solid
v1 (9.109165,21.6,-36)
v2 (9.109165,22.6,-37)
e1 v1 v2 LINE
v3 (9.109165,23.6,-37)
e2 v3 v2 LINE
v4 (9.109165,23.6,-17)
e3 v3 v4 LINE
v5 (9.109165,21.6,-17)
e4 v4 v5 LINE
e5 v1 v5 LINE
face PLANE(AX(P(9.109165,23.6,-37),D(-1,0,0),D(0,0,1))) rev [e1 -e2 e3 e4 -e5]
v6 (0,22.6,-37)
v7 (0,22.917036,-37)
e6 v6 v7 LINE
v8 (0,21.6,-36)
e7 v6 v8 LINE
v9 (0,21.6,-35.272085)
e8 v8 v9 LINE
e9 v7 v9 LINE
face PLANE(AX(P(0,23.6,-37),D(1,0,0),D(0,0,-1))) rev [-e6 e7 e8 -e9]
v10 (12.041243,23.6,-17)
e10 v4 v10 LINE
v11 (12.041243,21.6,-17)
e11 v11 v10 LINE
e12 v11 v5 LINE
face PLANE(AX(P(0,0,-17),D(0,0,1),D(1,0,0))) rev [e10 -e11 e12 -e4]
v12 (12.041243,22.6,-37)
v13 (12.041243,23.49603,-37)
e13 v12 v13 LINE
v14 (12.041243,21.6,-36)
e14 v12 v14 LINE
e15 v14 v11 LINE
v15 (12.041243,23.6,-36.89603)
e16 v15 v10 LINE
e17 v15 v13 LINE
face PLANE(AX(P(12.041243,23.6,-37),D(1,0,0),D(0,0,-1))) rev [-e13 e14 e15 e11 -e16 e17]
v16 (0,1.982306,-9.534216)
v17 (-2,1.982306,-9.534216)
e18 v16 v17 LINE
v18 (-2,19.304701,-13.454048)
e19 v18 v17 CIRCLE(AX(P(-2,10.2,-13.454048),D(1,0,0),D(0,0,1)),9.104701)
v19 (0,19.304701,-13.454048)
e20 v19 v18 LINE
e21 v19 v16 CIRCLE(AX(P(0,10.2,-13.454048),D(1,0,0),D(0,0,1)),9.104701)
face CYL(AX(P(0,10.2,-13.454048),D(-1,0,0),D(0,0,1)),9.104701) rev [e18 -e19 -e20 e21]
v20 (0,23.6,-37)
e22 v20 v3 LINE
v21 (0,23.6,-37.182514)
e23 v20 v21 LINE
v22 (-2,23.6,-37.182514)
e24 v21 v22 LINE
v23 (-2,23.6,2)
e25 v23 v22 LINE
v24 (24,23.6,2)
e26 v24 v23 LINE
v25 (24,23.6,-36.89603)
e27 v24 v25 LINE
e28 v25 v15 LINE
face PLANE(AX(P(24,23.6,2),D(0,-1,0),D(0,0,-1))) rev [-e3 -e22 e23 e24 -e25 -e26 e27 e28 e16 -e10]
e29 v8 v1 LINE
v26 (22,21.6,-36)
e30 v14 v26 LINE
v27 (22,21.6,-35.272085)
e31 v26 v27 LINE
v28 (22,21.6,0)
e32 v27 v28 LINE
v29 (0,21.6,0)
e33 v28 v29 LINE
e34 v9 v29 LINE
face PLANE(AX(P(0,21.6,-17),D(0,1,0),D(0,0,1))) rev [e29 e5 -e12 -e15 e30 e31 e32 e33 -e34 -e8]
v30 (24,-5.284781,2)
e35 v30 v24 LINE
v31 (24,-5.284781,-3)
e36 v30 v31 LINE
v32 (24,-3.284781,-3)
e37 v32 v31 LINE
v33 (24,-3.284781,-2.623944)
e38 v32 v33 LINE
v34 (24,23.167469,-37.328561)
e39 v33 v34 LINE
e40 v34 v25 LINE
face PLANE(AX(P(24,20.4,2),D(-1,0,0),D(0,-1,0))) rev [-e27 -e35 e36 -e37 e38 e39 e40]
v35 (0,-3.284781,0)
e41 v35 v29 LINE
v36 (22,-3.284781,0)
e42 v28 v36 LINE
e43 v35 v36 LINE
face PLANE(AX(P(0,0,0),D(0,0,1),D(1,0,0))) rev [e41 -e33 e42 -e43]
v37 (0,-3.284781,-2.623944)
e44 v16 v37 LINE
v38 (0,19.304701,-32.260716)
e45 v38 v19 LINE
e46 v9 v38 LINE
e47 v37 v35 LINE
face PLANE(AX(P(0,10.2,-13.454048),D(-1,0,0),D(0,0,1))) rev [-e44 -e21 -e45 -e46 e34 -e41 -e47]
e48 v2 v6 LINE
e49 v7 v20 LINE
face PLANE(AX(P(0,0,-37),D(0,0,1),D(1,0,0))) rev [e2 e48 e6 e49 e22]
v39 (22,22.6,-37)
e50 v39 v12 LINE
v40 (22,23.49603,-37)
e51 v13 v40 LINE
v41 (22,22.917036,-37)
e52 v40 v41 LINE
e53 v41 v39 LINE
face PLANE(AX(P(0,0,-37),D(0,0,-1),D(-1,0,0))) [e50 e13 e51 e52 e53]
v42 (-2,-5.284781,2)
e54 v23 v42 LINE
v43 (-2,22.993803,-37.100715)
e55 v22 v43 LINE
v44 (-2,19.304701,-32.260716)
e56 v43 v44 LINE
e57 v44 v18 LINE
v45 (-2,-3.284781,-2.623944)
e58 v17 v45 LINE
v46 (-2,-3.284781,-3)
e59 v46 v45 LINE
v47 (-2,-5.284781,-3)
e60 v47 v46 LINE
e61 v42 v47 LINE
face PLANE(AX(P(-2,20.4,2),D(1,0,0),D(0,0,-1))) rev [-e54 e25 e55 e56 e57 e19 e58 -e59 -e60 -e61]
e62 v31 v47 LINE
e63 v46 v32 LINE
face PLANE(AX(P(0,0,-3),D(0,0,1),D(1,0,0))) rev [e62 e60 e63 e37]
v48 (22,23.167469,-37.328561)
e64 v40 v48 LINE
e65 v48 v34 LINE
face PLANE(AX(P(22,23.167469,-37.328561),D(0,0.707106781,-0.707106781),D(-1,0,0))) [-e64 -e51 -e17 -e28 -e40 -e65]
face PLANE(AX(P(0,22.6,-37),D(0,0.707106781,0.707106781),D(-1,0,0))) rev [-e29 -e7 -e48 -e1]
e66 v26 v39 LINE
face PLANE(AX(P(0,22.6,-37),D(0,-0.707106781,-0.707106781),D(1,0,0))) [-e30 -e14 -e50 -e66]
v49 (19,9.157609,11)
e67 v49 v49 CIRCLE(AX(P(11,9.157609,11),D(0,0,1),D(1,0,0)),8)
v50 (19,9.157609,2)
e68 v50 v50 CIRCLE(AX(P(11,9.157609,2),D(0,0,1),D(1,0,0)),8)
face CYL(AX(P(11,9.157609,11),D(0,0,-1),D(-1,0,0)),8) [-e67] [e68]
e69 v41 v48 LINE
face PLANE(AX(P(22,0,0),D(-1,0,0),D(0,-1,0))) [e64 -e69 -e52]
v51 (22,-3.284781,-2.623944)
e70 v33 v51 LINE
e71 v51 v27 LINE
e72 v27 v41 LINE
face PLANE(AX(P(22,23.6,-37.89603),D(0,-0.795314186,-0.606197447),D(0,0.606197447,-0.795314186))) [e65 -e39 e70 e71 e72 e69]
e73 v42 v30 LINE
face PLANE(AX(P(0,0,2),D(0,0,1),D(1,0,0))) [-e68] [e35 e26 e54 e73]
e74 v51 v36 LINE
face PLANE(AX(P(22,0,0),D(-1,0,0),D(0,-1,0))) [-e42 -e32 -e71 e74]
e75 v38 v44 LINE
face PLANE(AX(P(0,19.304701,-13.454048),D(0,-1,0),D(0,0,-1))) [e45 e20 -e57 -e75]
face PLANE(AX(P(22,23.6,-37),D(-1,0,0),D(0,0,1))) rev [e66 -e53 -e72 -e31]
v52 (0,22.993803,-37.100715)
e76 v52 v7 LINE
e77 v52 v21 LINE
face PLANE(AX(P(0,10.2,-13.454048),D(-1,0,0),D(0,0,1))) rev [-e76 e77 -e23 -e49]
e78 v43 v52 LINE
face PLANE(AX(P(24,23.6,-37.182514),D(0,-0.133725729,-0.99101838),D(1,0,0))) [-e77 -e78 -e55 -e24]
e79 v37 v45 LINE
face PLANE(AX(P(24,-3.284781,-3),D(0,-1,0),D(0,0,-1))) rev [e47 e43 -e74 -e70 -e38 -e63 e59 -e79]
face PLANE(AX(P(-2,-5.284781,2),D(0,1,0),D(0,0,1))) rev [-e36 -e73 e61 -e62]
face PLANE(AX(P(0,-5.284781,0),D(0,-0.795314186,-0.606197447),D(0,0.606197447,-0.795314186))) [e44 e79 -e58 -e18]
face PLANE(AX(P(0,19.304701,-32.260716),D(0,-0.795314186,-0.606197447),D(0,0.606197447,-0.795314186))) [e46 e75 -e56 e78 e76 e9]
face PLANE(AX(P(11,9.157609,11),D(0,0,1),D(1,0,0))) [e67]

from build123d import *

# Parameters (mm, degrees)
SALIENTE_EXTRUIR1_DEPTH = 2
SALIENTE_EXTRUIR2_DEPTH = 2
SALIENTE_EXTRUIR3_DEPTH = 2
CROQUIS5_W              = 22
CROQUIS5_H              = 2
SALIENTE_EXTRUIR4_DEPTH = 17
CROQUIS6_W              = 26
CROQUIS6_H              = 2
SALIENTE_EXTRUIR5_DEPTH = 3
CROQUIS7_W              = 9.109165418
CROQUIS7_H              = 2
CROQUIS7_W_2            = 9.958756631
SALIENTE_EXTRUIR6_DEPTH = 20
CHAFL_N1_SIZE           = 1
CHAFL_N2_SIZE           = 1
CHAFL_N2_SIZE_2         = 0.713515305
CROQUIS8_R              = 8
SALIENTE_EXTRUIR7_DEPTH = 9


with BuildPart() as part:
    # Croquis1 → Saliente-Extruir1 (new body)
    with BuildSketch(Plane.XY):
        Polygon((-2, 23.6), (-2, 20.4), (-2, -5.284781413), (24, -5.284781413), (24, 20.4), (24, 23.6), align=None)
    extrude(amount=SALIENTE_EXTRUIR1_DEPTH)

    # Croquis2 → Saliente-Extruir2 (add)
    with BuildSketch(Plane(origin=(24, 0, 0), x_dir=(0, 0, -1), z_dir=(1, 0, 0))):
        Polygon((0, 23.6), (37.896029649, 23.6), (0, -5.284781413), align=None)
    extrude(amount=-SALIENTE_EXTRUIR2_DEPTH)

    # Croquis4 → Saliente-Extruir3 (add)
    with BuildSketch(Plane.ZY.offset(2)):
        with BuildLine():
            Line((-37.896029649, 23.6), (0, 23.6))
            Line((0, 23.6), (0, -5.284781413))
            Line((0, -5.284781413), (-9.534216457, 1.982305954))
            ThreePointArc((-9.534216457, 1.982305954), (-4.573867025, 12.209468647), (-13.454047634, 19.304700538))
            Line((-13.454047634, 19.304700538), (-32.260716249, 19.304700538))
            Line((-32.260716249, 19.304700538), (-37.896029649, 23.6))
        make_face()
    extrude(amount=-SALIENTE_EXTRUIR3_DEPTH)

    # Croquis5 → Saliente-Extruir4 (add)
    with BuildSketch(Plane(origin=(0, 0, 0), x_dir=(-1, 0, 0), z_dir=(0, 0, -1))):
        with Locations((-11, 22.6)):
            Rectangle(CROQUIS5_W, CROQUIS5_H)
    extrude(amount=SALIENTE_EXTRUIR4_DEPTH)

    # Croquis6 → Saliente-Extruir5 (add)
    with BuildSketch(Plane(origin=(0, 0, 0), x_dir=(-1, 0, 0), z_dir=(0, 0, -1))):
        with Locations((-11, -4.284781413)):
            Rectangle(CROQUIS6_W, CROQUIS6_H)
    extrude(amount=SALIENTE_EXTRUIR5_DEPTH)

    # Croquis7 → Saliente-Extruir6 (add)
    with BuildSketch(Plane(origin=(0, 0, -17), x_dir=(-1, 0, 0), z_dir=(0, 0, -1))):
        with Locations((-4.554582709, 22.6)):
            Rectangle(CROQUIS7_W, CROQUIS7_H)
        with Locations((-17.020621685, 22.6)):
            Rectangle(CROQUIS7_W_2, CROQUIS7_H)
    extrude(amount=SALIENTE_EXTRUIR6_DEPTH)

    # Chaflán1
    chafl_n1_edges = [part.edges().sort_by_distance(p)[0] for p in [
        (17.020621684, 21.6, -37),
        (4.554582709, 21.6, -37),
    ]]
    chamfer(chafl_n1_edges, length=CHAFL_N1_SIZE)

    # Chaflán2
    # the kernel refuses this chamfer: 1, 0.713515305 mm, written as the material it takes off along each edge
    with BuildSketch(Plane(origin=(26.571682988, 23.6, -37.896029649), x_dir=(0, 0, 1), z_dir=(-1, 0, 0))) as chafl_n2_piece_1:
        Polygon((CHAFL_N2_SIZE, 0), (CHAFL_N2_SIZE_2 * 0.79531418588, -CHAFL_N2_SIZE_2 * 0.606197446726), (0, 0), align=None)
    extrude(amount=7.143365976, mode=Mode.SUBTRACT)
    # the kernel refuses this chamfer: 1, 0.713515305 mm, written as the material it takes off along each edge
    with BuildSketch(Plane(origin=(22, 23.6, -37), x_dir=(0, 0, 1), z_dir=(-1, 0, 0))) as chafl_n2_2_piece_1_section:
        Polygon((CHAFL_N2_SIZE, 0), (0, -CHAFL_N2_SIZE), (0, 0), align=None)
    chafl_n2_2_piece_1 = extrude(amount=12.530439619, mode=Mode.PRIVATE)
    chafl_n2_2_piece_1 = split(chafl_n2_2_piece_1, bisect_by=Plane(origin=(22, 23.548014824, -36.948014824), z_dir=(-1.533293416683386e-15, 0.7071067811865533, -0.7071067811865418)), keep=Keep.TOP, mode=Mode.PRIVATE)
    add(chafl_n2_2_piece_1, mode=Mode.SUBTRACT)
    # the kernel refuses this chamfer: 1, 0.713515305 mm, written as the material it takes off along each edge
    with BuildSketch(Plane(origin=(-4.571682988, 23.6, -37.896029649), x_dir=(0, -0.6061974471264424, 0.7953141864052119), z_dir=(1, 0, 0))) as chafl_n2_3_piece_1:
        Polygon((CHAFL_N2_SIZE, 0), (CHAFL_N2_SIZE_2 * 0.79531418588, -CHAFL_N2_SIZE_2 * 0.606197446726), (0, 0), align=None)
    extrude(amount=7.143365976, mode=Mode.SUBTRACT)

    # Croquis8 → Saliente-Extruir7 (add)
    with BuildSketch(Plane.XY.offset(2)):
        with Locations((11, 9.157609293)):
            Circle(CROQUIS8_R)
    extrude(amount=SALIENTE_EXTRUIR7_DEPTH)


solid = part.part
